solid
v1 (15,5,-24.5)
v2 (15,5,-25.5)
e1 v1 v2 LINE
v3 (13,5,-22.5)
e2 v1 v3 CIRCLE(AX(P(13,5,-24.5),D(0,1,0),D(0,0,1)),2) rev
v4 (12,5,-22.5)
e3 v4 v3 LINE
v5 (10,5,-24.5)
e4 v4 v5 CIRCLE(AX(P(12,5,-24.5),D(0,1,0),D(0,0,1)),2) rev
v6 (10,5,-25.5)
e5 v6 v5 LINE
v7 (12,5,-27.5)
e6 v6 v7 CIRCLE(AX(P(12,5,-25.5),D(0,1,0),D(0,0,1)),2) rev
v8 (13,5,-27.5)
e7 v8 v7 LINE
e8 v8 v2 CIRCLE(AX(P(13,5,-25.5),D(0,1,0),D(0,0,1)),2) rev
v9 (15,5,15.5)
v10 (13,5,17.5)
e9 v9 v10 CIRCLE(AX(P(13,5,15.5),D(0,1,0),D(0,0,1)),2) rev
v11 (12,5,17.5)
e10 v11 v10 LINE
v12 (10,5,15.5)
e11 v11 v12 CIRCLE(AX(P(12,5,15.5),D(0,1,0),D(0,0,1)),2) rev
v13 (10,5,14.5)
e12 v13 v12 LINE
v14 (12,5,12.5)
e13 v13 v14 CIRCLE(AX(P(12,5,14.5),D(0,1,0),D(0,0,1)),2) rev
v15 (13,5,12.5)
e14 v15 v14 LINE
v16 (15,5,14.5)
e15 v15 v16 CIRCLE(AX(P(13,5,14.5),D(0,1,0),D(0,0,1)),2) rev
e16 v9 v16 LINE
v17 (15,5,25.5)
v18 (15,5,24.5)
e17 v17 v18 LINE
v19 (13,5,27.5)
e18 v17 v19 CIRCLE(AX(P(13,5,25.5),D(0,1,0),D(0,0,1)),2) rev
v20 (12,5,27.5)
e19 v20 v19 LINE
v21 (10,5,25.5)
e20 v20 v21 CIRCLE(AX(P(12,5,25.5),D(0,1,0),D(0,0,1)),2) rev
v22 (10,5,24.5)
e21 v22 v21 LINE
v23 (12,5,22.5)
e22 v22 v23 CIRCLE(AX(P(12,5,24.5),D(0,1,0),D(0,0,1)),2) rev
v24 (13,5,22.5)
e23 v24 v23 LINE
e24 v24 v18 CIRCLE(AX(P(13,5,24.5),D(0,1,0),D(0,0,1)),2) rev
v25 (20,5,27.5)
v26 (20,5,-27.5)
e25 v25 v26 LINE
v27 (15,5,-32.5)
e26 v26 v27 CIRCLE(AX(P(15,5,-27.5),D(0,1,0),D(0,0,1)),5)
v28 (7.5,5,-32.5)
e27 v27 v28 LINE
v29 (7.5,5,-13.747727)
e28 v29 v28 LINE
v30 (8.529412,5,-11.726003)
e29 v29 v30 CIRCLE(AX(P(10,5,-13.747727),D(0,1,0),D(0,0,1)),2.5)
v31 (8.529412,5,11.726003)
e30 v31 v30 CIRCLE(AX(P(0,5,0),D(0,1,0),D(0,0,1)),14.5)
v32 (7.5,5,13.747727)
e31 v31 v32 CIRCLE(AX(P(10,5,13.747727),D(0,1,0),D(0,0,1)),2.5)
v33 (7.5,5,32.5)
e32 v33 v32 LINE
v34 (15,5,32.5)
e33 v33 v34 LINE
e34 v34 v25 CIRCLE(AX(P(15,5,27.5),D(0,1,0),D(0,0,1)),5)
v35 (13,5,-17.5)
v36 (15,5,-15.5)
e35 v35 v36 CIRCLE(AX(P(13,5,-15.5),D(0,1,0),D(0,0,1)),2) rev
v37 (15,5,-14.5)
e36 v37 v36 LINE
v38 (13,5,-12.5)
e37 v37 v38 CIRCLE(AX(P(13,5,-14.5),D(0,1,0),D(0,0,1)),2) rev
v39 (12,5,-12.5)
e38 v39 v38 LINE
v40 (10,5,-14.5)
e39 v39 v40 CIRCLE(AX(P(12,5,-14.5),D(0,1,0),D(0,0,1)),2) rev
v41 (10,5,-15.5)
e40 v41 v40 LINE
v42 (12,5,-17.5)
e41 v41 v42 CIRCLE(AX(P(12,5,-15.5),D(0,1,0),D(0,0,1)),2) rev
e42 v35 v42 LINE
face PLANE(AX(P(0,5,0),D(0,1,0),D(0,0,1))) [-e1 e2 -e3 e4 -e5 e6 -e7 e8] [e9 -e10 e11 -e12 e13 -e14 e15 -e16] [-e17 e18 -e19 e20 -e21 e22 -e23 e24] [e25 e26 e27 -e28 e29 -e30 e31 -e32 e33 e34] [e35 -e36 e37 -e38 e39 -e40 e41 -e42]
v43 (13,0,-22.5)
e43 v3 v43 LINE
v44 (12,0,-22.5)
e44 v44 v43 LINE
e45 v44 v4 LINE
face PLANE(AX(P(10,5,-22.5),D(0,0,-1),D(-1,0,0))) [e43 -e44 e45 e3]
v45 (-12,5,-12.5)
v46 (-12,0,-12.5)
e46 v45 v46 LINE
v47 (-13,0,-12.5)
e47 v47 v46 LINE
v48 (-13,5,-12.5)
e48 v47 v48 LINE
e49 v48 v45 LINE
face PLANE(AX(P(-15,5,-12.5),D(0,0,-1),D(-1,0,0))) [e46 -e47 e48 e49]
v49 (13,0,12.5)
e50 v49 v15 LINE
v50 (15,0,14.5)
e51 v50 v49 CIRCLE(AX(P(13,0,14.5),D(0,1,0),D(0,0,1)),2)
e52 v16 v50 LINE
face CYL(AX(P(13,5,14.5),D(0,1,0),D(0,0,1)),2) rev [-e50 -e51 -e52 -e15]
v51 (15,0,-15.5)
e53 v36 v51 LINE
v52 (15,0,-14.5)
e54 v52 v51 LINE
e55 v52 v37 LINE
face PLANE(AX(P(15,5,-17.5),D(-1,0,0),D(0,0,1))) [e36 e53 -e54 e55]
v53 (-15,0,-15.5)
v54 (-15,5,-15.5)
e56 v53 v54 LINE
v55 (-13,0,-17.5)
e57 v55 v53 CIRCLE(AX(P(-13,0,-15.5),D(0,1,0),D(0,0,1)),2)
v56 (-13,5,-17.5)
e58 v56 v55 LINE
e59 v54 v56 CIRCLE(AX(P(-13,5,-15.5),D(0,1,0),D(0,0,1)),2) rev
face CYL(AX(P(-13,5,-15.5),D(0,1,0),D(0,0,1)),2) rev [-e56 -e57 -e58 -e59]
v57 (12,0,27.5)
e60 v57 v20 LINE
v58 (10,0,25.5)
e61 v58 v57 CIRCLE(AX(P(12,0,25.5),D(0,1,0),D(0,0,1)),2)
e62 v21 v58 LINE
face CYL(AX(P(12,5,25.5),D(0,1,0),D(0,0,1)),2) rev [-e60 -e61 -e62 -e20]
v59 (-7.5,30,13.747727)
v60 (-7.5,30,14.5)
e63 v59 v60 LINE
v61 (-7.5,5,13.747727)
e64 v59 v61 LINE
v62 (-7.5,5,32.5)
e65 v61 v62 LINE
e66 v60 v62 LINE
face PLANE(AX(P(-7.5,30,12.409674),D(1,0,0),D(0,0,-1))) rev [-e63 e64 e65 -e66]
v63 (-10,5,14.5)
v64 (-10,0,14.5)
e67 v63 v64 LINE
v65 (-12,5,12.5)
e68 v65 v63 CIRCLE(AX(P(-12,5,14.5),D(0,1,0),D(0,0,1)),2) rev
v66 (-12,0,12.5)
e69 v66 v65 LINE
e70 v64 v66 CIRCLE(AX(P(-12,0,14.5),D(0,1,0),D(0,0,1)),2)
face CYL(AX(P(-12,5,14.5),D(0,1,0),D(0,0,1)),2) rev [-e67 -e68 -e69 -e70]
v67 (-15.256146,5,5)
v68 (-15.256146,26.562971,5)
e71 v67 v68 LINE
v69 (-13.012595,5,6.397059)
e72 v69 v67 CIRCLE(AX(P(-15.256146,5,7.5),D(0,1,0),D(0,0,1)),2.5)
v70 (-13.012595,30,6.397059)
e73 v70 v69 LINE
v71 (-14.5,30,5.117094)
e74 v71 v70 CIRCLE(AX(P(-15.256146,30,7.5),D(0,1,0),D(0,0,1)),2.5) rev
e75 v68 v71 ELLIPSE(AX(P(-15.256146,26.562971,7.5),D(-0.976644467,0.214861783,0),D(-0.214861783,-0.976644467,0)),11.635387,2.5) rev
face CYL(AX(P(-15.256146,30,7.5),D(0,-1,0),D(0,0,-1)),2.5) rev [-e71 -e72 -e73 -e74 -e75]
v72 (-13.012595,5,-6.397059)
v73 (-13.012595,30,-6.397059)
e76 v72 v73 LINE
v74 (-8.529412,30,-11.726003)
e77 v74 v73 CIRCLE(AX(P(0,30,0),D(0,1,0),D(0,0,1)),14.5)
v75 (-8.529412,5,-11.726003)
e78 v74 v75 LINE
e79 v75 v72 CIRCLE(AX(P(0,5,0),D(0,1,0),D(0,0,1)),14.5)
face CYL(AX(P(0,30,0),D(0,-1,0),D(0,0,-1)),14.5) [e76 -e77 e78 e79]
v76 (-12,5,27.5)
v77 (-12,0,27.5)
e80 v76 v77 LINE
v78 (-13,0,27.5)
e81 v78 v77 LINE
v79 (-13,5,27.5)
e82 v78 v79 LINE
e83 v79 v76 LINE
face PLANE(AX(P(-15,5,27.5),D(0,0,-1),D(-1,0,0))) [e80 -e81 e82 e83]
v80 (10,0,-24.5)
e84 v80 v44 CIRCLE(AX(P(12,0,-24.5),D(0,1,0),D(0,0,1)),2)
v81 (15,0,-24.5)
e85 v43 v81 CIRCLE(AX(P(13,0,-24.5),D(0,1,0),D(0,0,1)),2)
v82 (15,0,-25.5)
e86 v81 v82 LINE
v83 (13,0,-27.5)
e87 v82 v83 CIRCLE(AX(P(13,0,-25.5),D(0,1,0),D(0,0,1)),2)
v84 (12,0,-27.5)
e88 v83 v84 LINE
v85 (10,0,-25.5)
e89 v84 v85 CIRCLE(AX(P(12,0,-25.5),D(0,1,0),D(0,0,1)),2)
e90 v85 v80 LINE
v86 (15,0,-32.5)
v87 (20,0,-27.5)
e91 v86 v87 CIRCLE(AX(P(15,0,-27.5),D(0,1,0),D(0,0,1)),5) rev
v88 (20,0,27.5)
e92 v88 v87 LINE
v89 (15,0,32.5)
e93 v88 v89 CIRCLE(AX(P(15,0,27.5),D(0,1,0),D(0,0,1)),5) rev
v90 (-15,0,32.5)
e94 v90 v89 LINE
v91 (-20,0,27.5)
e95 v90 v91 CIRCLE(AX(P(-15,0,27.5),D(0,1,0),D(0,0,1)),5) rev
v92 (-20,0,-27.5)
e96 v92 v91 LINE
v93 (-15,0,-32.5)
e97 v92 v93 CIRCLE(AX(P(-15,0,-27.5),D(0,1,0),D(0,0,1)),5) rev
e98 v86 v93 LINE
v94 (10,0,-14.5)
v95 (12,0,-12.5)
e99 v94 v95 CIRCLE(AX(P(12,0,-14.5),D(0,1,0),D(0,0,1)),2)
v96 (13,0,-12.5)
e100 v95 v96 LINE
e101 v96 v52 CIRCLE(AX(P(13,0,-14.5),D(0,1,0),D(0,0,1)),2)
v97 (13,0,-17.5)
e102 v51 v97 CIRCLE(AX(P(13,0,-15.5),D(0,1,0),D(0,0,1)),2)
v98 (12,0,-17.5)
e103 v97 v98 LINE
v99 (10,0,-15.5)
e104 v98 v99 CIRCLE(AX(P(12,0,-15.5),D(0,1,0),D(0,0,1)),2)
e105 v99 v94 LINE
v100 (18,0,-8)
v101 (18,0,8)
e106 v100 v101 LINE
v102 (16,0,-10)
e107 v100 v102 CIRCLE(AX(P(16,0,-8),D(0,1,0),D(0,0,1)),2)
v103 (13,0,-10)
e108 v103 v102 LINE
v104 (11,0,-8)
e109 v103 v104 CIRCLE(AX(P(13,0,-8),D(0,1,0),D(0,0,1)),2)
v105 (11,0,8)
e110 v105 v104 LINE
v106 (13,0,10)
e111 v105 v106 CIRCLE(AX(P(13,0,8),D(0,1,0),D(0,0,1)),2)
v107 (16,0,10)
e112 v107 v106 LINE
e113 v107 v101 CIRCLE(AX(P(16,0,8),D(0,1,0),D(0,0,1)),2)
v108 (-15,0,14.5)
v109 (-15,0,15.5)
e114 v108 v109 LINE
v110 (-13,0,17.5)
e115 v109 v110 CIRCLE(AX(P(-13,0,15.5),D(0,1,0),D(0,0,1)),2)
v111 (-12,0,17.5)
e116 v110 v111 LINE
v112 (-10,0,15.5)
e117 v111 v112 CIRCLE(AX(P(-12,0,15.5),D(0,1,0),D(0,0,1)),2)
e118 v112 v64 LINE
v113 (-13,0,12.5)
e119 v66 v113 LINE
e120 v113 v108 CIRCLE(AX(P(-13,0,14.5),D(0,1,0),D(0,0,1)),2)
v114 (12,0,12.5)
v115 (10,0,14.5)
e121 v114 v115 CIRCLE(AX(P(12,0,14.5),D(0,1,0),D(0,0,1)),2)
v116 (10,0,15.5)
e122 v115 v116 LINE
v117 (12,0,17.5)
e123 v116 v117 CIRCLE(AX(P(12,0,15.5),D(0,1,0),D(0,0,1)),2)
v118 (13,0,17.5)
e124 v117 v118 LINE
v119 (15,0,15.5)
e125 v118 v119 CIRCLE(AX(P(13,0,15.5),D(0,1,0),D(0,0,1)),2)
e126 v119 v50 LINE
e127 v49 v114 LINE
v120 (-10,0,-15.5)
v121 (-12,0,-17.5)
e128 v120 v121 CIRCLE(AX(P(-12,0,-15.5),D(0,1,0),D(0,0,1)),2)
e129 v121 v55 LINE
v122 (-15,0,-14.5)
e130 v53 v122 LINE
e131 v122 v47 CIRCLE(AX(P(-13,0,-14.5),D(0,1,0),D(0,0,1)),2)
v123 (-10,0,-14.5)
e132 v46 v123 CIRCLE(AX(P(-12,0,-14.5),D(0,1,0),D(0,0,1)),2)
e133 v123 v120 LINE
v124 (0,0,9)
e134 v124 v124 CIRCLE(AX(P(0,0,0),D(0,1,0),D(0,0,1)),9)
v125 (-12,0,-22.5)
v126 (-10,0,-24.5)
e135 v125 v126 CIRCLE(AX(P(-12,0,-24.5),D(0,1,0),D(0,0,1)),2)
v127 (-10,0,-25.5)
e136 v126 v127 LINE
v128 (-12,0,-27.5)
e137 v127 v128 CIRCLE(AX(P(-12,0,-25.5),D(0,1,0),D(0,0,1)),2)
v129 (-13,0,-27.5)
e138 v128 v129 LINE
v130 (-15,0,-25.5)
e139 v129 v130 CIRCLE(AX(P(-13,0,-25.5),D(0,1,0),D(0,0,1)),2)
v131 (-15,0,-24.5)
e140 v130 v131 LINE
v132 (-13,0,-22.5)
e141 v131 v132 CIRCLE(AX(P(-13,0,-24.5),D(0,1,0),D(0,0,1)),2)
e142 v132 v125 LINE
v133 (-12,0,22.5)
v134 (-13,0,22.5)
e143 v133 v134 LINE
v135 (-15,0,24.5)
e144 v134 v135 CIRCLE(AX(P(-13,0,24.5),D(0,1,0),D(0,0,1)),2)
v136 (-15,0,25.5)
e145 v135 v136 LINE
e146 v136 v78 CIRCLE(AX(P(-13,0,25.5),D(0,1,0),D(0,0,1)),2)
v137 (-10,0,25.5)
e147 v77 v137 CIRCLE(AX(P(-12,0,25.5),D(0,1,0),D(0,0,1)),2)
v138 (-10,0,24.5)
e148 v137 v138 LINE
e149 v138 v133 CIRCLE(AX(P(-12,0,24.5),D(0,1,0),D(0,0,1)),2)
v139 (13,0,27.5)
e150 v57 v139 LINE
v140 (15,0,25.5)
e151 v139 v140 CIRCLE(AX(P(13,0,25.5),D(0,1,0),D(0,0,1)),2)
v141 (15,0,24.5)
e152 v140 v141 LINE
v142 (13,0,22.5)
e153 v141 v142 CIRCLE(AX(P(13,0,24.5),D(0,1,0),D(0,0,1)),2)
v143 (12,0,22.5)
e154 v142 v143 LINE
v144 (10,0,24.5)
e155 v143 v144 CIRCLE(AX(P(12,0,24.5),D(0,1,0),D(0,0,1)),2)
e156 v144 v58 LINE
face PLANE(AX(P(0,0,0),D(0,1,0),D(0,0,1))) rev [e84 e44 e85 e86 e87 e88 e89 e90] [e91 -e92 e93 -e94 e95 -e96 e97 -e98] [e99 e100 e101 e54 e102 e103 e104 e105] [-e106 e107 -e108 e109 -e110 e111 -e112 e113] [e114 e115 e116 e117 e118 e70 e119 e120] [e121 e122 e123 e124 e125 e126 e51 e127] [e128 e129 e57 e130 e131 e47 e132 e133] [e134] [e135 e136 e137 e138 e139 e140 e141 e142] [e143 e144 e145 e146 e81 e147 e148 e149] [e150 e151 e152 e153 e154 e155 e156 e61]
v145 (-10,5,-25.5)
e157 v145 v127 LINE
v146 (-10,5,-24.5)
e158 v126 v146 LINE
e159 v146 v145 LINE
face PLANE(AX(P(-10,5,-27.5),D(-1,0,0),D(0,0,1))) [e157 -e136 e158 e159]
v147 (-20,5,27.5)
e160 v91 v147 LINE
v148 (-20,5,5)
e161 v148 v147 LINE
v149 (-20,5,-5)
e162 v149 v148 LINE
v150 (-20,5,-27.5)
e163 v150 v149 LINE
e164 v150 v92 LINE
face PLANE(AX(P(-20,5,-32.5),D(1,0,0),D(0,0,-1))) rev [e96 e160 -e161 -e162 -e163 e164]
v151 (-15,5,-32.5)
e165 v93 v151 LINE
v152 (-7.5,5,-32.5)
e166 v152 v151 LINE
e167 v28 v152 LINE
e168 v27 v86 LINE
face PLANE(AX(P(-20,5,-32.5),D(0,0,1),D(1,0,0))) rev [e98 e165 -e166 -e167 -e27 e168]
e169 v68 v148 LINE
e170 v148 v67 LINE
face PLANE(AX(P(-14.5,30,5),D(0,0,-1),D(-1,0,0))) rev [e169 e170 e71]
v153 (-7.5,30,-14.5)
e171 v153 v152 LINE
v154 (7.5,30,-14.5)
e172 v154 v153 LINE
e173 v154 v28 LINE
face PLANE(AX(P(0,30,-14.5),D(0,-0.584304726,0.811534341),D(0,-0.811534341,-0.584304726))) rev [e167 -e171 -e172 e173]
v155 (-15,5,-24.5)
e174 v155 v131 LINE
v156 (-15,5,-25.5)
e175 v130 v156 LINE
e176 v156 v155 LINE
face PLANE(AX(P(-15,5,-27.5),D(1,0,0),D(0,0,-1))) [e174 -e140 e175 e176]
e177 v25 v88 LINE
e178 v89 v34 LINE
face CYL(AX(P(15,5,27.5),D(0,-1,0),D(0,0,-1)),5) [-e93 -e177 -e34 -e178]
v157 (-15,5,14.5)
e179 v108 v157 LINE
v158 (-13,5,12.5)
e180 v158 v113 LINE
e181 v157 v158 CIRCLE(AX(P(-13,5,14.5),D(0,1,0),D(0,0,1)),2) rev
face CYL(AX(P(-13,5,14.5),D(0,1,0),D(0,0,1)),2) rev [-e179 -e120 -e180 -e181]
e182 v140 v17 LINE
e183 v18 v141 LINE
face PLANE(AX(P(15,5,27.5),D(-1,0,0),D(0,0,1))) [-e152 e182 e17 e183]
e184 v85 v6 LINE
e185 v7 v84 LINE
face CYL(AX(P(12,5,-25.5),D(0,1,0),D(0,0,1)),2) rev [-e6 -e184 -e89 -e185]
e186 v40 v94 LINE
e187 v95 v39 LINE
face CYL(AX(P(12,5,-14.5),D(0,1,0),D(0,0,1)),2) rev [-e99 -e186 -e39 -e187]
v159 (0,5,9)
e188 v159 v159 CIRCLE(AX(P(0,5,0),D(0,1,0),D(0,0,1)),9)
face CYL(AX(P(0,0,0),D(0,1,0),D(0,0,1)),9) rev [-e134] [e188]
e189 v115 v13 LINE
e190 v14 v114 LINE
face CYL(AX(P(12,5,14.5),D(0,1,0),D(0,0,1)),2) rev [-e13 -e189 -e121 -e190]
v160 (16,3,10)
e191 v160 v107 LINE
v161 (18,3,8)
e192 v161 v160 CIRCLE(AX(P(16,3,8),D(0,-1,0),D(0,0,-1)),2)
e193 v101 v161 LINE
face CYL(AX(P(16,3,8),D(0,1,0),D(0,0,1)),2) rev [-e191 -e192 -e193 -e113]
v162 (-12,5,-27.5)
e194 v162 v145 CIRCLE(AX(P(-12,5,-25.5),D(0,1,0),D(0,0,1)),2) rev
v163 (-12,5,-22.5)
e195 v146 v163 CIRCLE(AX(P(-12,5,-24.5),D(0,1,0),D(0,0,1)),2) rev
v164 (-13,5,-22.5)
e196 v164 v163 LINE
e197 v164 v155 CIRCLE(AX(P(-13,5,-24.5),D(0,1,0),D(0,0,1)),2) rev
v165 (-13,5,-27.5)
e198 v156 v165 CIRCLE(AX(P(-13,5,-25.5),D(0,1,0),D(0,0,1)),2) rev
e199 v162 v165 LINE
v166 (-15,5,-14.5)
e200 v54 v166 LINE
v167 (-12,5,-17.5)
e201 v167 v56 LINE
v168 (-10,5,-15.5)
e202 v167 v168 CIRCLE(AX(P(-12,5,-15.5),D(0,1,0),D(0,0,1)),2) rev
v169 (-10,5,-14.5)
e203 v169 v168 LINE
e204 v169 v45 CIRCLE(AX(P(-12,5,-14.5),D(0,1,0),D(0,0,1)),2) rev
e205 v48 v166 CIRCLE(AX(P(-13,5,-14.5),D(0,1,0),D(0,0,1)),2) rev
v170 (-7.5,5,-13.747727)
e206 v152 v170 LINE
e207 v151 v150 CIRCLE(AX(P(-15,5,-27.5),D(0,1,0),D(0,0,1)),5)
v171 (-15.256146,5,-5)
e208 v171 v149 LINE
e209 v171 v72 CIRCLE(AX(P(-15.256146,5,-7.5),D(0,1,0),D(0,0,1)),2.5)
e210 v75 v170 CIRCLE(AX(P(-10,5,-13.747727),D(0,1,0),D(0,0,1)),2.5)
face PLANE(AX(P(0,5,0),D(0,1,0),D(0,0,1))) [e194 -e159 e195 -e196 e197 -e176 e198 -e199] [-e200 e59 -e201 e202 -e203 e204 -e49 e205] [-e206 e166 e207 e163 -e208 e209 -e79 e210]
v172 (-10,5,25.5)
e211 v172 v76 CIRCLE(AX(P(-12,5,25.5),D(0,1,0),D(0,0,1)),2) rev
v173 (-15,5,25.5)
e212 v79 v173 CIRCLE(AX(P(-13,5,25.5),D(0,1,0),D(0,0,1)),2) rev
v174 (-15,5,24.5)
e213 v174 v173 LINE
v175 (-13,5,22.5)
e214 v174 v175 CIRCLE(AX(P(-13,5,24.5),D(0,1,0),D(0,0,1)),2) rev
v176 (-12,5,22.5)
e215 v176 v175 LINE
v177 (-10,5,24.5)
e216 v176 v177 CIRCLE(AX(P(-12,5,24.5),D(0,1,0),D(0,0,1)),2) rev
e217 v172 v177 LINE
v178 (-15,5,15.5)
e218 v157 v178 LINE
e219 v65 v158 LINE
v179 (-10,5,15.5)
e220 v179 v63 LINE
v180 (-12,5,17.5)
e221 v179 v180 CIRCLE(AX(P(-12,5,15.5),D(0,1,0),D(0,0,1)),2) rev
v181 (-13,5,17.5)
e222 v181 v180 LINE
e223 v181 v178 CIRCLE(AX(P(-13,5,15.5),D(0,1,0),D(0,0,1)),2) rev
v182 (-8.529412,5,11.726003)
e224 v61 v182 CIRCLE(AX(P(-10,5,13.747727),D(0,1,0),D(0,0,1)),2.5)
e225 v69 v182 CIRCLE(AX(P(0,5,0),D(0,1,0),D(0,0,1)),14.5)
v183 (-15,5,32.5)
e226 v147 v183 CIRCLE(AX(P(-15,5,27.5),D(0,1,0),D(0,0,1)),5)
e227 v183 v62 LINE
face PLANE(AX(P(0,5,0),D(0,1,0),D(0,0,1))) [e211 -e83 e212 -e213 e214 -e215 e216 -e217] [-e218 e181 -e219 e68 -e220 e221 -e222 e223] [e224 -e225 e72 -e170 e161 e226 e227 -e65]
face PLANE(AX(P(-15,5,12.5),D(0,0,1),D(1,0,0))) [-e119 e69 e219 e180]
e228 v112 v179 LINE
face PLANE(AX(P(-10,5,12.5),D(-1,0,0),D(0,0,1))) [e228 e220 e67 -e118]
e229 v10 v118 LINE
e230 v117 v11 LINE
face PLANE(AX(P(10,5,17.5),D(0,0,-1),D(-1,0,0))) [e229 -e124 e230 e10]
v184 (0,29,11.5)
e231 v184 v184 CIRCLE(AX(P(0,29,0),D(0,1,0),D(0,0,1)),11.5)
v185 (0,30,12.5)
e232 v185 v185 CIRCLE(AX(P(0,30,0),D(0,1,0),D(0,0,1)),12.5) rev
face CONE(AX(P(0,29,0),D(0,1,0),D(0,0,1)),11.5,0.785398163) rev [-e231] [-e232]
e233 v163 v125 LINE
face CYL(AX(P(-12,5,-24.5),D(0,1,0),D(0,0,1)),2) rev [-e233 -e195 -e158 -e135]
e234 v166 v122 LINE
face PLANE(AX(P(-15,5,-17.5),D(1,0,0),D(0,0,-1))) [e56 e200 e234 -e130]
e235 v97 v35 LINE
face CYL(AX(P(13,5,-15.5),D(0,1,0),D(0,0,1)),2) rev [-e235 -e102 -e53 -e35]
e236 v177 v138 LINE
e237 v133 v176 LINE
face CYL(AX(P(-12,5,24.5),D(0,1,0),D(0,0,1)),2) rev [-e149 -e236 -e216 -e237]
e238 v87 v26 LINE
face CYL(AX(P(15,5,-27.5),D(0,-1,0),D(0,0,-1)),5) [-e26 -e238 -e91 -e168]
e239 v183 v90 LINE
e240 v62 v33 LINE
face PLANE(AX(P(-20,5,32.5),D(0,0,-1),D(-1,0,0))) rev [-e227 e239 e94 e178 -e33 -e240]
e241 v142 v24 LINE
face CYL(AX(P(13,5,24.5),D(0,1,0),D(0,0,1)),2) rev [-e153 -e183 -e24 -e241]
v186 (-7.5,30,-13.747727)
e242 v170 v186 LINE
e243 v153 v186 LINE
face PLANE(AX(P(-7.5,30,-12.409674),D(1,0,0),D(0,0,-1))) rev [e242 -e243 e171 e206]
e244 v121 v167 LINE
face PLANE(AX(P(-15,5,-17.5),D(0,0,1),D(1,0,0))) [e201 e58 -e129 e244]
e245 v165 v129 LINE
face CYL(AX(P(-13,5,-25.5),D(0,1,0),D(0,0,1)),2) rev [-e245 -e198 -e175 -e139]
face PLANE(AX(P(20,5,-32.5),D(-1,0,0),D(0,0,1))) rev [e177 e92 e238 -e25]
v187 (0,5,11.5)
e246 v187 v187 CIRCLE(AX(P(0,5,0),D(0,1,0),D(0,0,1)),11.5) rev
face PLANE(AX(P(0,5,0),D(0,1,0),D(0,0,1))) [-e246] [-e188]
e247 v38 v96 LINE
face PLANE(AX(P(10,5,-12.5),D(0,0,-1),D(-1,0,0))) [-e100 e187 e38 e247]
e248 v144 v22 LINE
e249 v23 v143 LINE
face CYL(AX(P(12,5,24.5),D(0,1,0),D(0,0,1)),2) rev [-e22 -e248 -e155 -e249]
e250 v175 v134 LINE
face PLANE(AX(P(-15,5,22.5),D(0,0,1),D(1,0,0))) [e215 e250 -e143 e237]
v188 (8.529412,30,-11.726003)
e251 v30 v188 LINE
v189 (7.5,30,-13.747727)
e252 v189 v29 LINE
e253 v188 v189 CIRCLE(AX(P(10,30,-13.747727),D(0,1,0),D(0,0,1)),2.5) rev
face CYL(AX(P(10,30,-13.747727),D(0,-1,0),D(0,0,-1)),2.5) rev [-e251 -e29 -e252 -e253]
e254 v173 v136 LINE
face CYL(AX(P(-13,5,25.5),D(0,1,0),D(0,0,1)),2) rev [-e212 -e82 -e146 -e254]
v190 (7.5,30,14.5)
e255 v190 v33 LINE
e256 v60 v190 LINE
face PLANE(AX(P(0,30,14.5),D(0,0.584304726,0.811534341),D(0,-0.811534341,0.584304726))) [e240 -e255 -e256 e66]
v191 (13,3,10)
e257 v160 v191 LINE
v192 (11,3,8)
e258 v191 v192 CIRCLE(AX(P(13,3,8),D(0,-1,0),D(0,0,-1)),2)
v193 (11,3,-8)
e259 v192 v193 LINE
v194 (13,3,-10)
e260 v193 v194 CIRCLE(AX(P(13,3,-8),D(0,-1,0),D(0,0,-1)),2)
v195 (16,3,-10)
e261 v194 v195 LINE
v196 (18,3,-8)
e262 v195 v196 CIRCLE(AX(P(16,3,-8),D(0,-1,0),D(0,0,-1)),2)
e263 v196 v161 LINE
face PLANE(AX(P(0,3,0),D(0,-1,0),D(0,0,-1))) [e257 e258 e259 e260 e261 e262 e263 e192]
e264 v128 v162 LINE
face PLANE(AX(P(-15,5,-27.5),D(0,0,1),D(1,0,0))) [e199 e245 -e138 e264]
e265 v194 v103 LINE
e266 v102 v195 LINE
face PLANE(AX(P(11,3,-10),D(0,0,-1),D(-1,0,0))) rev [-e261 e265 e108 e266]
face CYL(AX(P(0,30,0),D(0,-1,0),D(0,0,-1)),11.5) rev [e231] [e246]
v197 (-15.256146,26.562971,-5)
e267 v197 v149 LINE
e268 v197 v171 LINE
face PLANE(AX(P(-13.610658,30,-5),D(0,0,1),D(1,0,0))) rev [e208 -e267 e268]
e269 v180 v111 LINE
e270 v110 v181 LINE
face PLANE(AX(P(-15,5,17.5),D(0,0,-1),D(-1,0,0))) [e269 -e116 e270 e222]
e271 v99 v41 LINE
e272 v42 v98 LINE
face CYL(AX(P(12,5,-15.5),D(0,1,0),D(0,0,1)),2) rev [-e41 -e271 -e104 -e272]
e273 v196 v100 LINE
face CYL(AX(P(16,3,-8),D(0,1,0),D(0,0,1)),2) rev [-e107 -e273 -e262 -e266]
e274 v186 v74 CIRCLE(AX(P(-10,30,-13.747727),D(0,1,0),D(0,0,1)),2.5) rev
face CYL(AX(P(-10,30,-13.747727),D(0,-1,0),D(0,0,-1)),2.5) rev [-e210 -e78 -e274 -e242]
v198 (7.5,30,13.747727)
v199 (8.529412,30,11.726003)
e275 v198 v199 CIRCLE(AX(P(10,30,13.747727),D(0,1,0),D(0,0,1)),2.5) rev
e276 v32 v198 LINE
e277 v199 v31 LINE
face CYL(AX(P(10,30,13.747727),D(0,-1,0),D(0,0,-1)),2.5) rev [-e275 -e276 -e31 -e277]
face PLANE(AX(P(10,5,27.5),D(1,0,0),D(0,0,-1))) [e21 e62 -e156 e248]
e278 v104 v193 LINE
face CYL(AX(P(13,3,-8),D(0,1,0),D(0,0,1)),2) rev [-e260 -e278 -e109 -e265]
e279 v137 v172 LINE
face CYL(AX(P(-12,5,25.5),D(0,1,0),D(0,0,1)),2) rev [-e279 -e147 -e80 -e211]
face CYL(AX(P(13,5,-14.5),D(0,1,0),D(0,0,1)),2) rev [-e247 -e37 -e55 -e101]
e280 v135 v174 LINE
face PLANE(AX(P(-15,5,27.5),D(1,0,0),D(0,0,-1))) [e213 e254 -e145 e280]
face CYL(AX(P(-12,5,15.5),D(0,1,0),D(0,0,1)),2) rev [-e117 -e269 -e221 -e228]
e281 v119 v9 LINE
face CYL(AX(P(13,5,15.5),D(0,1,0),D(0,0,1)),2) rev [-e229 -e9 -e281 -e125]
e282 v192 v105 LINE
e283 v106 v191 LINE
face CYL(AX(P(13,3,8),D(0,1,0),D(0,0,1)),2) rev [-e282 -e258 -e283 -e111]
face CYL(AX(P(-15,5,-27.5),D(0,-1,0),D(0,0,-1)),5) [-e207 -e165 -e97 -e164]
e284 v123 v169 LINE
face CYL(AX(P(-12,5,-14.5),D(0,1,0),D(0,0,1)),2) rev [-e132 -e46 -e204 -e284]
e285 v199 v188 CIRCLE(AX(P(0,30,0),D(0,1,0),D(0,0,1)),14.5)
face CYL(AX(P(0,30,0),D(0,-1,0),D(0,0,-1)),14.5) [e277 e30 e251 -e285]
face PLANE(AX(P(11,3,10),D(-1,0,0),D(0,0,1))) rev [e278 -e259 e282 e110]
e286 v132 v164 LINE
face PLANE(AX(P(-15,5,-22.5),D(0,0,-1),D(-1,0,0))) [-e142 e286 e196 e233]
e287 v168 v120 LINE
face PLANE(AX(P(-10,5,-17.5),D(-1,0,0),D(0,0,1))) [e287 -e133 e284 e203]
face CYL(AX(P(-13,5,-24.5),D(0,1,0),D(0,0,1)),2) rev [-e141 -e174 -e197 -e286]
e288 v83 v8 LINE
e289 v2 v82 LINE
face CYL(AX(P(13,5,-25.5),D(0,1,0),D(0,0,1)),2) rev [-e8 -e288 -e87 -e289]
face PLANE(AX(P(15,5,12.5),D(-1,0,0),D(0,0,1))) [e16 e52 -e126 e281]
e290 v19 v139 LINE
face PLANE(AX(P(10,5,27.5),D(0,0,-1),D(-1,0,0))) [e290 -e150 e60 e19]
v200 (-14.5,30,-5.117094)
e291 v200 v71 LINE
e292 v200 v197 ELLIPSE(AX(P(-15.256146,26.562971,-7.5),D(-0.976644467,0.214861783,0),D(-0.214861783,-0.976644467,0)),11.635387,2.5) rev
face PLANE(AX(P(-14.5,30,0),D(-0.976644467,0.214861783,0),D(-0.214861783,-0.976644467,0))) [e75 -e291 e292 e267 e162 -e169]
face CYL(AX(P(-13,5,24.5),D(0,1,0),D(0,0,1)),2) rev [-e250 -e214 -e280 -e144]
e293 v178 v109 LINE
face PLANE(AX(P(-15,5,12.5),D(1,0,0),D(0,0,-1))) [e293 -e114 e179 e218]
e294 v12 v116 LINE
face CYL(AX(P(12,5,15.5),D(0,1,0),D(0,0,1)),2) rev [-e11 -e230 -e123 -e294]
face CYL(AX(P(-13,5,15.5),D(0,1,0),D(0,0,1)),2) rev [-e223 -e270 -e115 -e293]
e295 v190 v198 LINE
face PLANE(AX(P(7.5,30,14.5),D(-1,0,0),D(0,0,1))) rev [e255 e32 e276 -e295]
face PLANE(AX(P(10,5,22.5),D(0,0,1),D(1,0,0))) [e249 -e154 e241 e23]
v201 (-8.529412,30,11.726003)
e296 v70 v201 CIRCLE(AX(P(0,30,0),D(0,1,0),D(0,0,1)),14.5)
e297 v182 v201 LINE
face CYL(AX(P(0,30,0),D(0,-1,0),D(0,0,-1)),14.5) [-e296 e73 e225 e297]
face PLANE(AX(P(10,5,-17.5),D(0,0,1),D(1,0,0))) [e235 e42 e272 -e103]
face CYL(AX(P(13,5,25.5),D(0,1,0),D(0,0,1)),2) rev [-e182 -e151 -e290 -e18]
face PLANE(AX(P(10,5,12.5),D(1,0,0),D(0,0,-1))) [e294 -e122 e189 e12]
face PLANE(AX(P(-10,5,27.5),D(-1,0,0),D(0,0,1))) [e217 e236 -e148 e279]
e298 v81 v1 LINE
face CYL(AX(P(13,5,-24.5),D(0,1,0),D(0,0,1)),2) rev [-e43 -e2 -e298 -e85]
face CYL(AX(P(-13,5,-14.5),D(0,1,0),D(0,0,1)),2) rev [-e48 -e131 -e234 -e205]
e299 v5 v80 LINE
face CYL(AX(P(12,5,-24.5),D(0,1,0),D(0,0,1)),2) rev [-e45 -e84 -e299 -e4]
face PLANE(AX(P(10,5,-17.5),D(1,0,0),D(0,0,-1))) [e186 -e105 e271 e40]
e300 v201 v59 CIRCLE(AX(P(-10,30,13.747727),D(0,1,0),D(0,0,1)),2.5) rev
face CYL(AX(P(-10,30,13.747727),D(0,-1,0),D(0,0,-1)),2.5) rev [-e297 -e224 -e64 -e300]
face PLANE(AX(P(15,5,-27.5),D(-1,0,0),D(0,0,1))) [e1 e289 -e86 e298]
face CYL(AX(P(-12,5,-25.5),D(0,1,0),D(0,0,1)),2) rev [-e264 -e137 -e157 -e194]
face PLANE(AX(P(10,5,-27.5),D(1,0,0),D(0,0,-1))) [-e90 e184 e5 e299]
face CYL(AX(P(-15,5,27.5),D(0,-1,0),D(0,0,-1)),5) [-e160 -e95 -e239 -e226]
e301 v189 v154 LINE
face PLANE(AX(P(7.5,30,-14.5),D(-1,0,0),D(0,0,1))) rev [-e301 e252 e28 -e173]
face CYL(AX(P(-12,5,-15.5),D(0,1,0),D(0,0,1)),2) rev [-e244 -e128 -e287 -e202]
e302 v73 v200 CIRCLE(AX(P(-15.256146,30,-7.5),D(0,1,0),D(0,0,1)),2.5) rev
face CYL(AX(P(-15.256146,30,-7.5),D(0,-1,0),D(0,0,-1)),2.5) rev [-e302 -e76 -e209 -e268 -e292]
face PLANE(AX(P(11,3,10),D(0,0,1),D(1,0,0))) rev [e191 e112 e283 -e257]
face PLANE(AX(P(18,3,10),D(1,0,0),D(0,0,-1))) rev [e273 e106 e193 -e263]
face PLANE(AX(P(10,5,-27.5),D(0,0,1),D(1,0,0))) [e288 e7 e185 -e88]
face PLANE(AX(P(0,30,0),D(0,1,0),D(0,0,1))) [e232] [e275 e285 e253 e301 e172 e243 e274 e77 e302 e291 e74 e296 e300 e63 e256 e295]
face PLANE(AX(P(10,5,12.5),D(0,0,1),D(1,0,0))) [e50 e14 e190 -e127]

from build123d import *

# Parameters (mm, degrees)
SKETCH1_W                       = 40
SKETCH1_H                       = 65
SKETCH1_W_2                     = 5
SKETCH1_H_2                     = 5
MOUNTBASE_DEPTH                 = 5
SKETCH4_R                       = 11.5
PIPEBASE_DEPTH                  = 25
RIB3_REACH                      = 50.541
SKETCH6_WALL_W                  = 124.680290668
SKETCH6_WALL_H                  = 10
RIB5_REACH                      = 50.541
SKETCH7_WALL_W                  = 129.888282796
SKETCH7_WALL_H                  = 15
BASEFILLET_R                    = 5
PIPEFILLET_R                    = 2.5
INNERMATERIALREMOVAL_DEPTH      = 46.620718977
INNERMATERIALREMOVAL_DEPTH_BACK = 46.620718977
SKETCH8_R                       = 9
PIPECHAMFER_SIZE                = 1
FILLET5_R                       = 2
CUT_EXTRUDE2_START              = -25
CUT_EXTRUDE2_DEPTH              = 25
SKETCH10_W                      = 7
SKETCH10_H                      = 20
CUT_EXTRUDE3_DEPTH              = 3
FILLET6_R                       = 2


with BuildPart() as part:
    # Sketch1 → MountBase (new body)
    with BuildSketch(Plane(origin=(0, 0, 0), x_dir=(1, 0, 0), z_dir=(0, 1, 0))):
        Rectangle(SKETCH1_W, SKETCH1_H)
        with Locations((-12.5, 15)):
            Rectangle(SKETCH1_W_2, SKETCH1_H_2, mode=Mode.SUBTRACT)
        with Locations((-12.5, -15)):
            Rectangle(SKETCH1_W_2, SKETCH1_H_2, mode=Mode.SUBTRACT)
        with Locations((12.5, 15)):
            Rectangle(SKETCH1_W_2, SKETCH1_H_2, mode=Mode.SUBTRACT)
        with Locations((12.5, -15)):
            Rectangle(SKETCH1_W_2, SKETCH1_H_2, mode=Mode.SUBTRACT)
        with Locations((-12.5, -25)):
            Rectangle(SKETCH1_W_2, SKETCH1_H_2, mode=Mode.SUBTRACT)
        with Locations((12.5, -25)):
            Rectangle(SKETCH1_W_2, SKETCH1_H_2, mode=Mode.SUBTRACT)
        with Locations((-12.5, 25)):
            Rectangle(SKETCH1_W_2, SKETCH1_H_2, mode=Mode.SUBTRACT)
        with Locations((12.5, 25)):
            Rectangle(SKETCH1_W_2, SKETCH1_H_2, mode=Mode.SUBTRACT)
    extrude(amount=MOUNTBASE_DEPTH)

    # Sketch4 → PipeBase (add)
    with BuildSketch(Plane(origin=(0, 5, 0), x_dir=(1, 0, 0), z_dir=(0, 1, 0))):
        with BuildLine():
            Line((-14.5, 5), (-14.5, -5))
            Line((-14.5, -5), (-13.610657589, -5))
            ThreePointArc((-13.610657589, -5), (-11.186634071, -9.225465742), (-7.5, -12.409673646))
            Line((-7.5, -12.409673646), (-7.5, -14.5))
            Line((-7.5, -14.5), (7.5, -14.5))
            Line((7.5, -14.5), (7.5, -12.409673646))
            ThreePointArc((7.5, -12.409673646), (11.186634071, -9.225465742), (13.610657589, -5))
            Line((13.610657589, -5), (14.5, -5))
            Line((14.5, -5), (14.5, 5))
            Line((14.5, 5), (13.610657589, 5))
            ThreePointArc((13.610657589, 5), (11.186634071, 9.225465742), (7.5, 12.409673646))
            Line((7.5, 12.409673646), (7.5, 14.5))
            Line((7.5, 14.5), (-7.5, 14.5))
            Line((-7.5, 14.5), (-7.5, 12.409673646))
            ThreePointArc((-7.5, 12.409673646), (-11.186634071, 9.225465742), (-13.610657589, 5))
            Line((-13.610657589, 5), (-14.5, 5))
        make_face()
        with Locations(Location((0, 0, 0), (0, 0, 270))):
            Circle(SKETCH4_R, mode=Mode.SUBTRACT)
    extrude(amount=PIPEBASE_DEPTH)

    # Sketch6 wall → Rib3 (add, up to next)
    with BuildSketch(Plane(origin=(-17.25, 17.5, 0), x_dir=(-0.214861782675, -0.976644466705, 0), z_dir=(0.976644466705, -0.214861782675, 0)), mode=Mode.PRIVATE) as rib3_sk1:
        Rectangle(SKETCH6_WALL_W, SKETCH6_WALL_H)
    rib3_tool1 = extrude(rib3_sk1.sketch, amount=RIB3_REACH, mode=Mode.PRIVATE) - part.part
    rib3 = rib3_tool1.solids().sort_by_distance((-17.25, 17.5, 0))[0]
    add(rib3)

    # Mirror1: Rib3 across plane
    add(rib3.mirror(Plane(origin=(0, 0, 0), x_dir=(0, 0, 1), z_dir=(1, 0, 0))))

    # Sketch7 wall → Rib5 (add, up to next)
    with BuildSketch(Plane(origin=(0, 17.5, 23.5), x_dir=(0, -0.811534341451, 0.584304725845), z_dir=(0, -0.584304725845, -0.811534341451)), mode=Mode.PRIVATE) as rib5_sk1:
        Rectangle(SKETCH7_WALL_W, SKETCH7_WALL_H)
    rib5_tool1 = extrude(rib5_sk1.sketch, amount=RIB5_REACH, mode=Mode.PRIVATE) - part.part
    rib5 = rib5_tool1.solids().sort_by_distance((0, 17.5, 23.5))[0]
    add(rib5)

    # Mirror2: Rib5 across plane
    add(rib5.mirror(Plane.XY))

    # BaseFillet
    basefillet_edges = [part.edges().sort_by_distance(p)[0] for p in [
        (20, 2.5, 32.5),
        (-20, 2.5, 32.5),
        (-20, 2.5, -32.5),
        (20, 2.5, -32.5),
    ]]
    fillet(basefillet_edges, radius=BASEFILLET_R)

    # PipeFillet
    # the kernel refuses this fillet: 2.5 mm, written as the material it adds along each edge
    with BuildSketch(Plane(origin=(-13.610657589, 0.886278216, -5), x_dir=(-1, 0, 0), z_dir=(0, 1, 0))) as pipefillet_piece_1_section:
        with BuildLine():
            CenterArc((1.645488714, -2.5), PIPEFILLET_R, 90, 63.821031296)
            ThreePointArc((-0.598062213, -1.397058824), (-0.280715993, -0.706369867), (0, 0))
            Line((0, 0), (1.645488714, 0))
        make_face()
    pipefillet_piece_1 = extrude(amount=29.113721784, mode=Mode.PRIVATE)
    pipefillet_piece_1 = split(pipefillet_piece_1, bisect_by=Plane(origin=(-20.148077302, 4.326921354, -5.304724049), z_dir=(0.976644466705111, -0.2148617826750244, 0)), keep=Keep.TOP, mode=Mode.PRIVATE)
    add(pipefillet_piece_1)
    with BuildSketch(Plane(origin=(-7.5, 1.654866403, -12.409673646), x_dir=(-0.8330213423374977, 0, 0.5532408546105696), z_dir=(0, 1, 0))) as pipefillet_piece_2:
        with BuildLine():
            CenterArc((1.342287528, -2.497729208), PIPEFILLET_R, 92.442244575, 53.968120928)
            Line((-0.740265828, -1.114627072), (0, 0))
            ThreePointArc((0, 0), (0.617878386, -0.013170592), (1.235756772, 0))
        make_face()
    extrude(amount=28.345133597)
    with BuildSketch(Plane(origin=(-13.610657589, 0.886278216, 5), x_dir=(-1, 0, 0), z_dir=(0, 1, 0))) as pipefillet_piece_3_section:
        with BuildLine():
            CenterArc((1.645488714, 2.5), PIPEFILLET_R, 206.178968704, 63.821031296)
            ThreePointArc((-0.598062213, 1.397058824), (-0.280715993, 0.706369867), (0, 0))
            Line((0, 0), (1.645488714, 0))
        make_face()
    pipefillet_piece_3 = extrude(amount=29.113721784, mode=Mode.PRIVATE)
    pipefillet_piece_3 = split(pipefillet_piece_3, bisect_by=Plane(origin=(-20.148077302, 4.326921354, 5.304724049), z_dir=(0.976644466705111, -0.2148617826750244, 0)), keep=Keep.TOP, mode=Mode.PRIVATE)
    add(pipefillet_piece_3)
    with BuildSketch(Plane(origin=(-7.5, 1.654866403, 12.409673646), x_dir=(-0.8330213423374981, 0, -0.5532408546105689), z_dir=(0, 1, 0))) as pipefillet_piece_4:
        with BuildLine():
            CenterArc((1.342287528, 2.497729208), PIPEFILLET_R, 213.589634497, 53.968120928)
            Line((-0.740265828, 1.114627072), (0, 0))
            ThreePointArc((0, 0), (0.617878386, 0.013170592), (1.235756772, 0))
        make_face()
    extrude(amount=28.345133597)
    with BuildSketch(Plane(origin=(7.5, 1.654866403, 12.409673646), x_dir=(0, 0, 1), z_dir=(0, 1, 0))) as pipefillet_piece_5:
        with BuildLine():
            CenterArc((1.338053439, 2.5), PIPEFILLET_R, 216.031879072, 53.968120928)
            ThreePointArc((-0.683671132, 1.029411765), (-0.330864182, 0.521992392), (0, 0))
            Line((0, 0), (1.338053439, 0))
        make_face()
    extrude(amount=28.345133597)
    with BuildSketch(Plane(origin=(13.610657589, 0.886278216, 5), x_dir=(1, 0, 0), z_dir=(0, 1, 0))) as pipefillet_piece_6_section:
        with BuildLine():
            CenterArc((1.645488714, -2.5), PIPEFILLET_R, 90, 63.821031296)
            ThreePointArc((-0.598062213, -1.397058824), (-0.280715993, -0.706369867), (0, 0))
            Line((0, 0), (1.645488714, 0))
        make_face()
    pipefillet_piece_6 = extrude(amount=29.113721784, mode=Mode.PRIVATE)
    pipefillet_piece_6 = split(pipefillet_piece_6, bisect_by=Plane(origin=(20.148077302, 4.326921354, 5.304724049), z_dir=(-0.976644466705111, -0.21486178267502437, 0)), keep=Keep.TOP, mode=Mode.PRIVATE)
    add(pipefillet_piece_6)
    with BuildSketch(Plane(origin=(13.610657589, 0.886278216, -5), x_dir=(-0.3935427494511154, 0, -0.9193063169338371), z_dir=(0, 1, 0))) as pipefillet_piece_7_section:
        with BuildLine():
            CenterArc((1.65069564, -2.496565042), PIPEFILLET_R, 93.003848679, 63.821031296)
            Line((-0.647570153, -1.512708169), (0, 0))
            ThreePointArc((0, 0), (0.759844025, -0.019922754), (1.519688049, 0))
        make_face()
    pipefillet_piece_7 = extrude(amount=29.113721784, mode=Mode.PRIVATE)
    pipefillet_piece_7 = split(pipefillet_piece_7, bisect_by=Plane(origin=(20.148077302, 4.326921354, -5.304724049), z_dir=(-0.976644466705111, -0.21486178267502437, 0)), keep=Keep.TOP, mode=Mode.PRIVATE)
    add(pipefillet_piece_7)
    with BuildSketch(Plane(origin=(7.5, 1.654866403, -12.409673646), x_dir=(0, 0, -1), z_dir=(0, 1, 0))) as pipefillet_piece_8:
        with BuildLine():
            CenterArc((1.338053439, -2.5), PIPEFILLET_R, 90, 53.968120928)
            ThreePointArc((-0.683671132, -1.029411765), (-0.330864182, -0.521992392), (0, 0))
            Line((0, 0), (1.338053439, 0))
        make_face()
    extrude(amount=28.345133597)

    # Sketch8 → InnerMaterialRemoval (cut, two sides: drawn at the far end of the back side and taken through both)
    with BuildSketch(Plane(origin=(0, 5, 0), x_dir=(1, 0, 0), z_dir=(0, 1, 0)).offset(-INNERMATERIALREMOVAL_DEPTH_BACK)):
        with Locations(Location((0, 0, 0), (0, 0, 270))):
            Circle(SKETCH8_R)
    extrude(amount=INNERMATERIALREMOVAL_DEPTH + INNERMATERIALREMOVAL_DEPTH_BACK, mode=Mode.SUBTRACT)

    # PipeChamfer
    pipechamfer_edges = [part.edges().sort_by_distance(p)[0] for p in [
        (0, 30, -11.5),
    ]]
    chamfer(pipechamfer_edges, length=PIPECHAMFER_SIZE)

    # Fillet5
    fillet5_edges = [part.edges().sort_by_distance(p)[0] for p in [
        (10, 2.5, -27.5),
        (10, 2.5, -22.5),
        (15, 2.5, -22.5),
        (15, 2.5, -27.5),
        (-10, 2.5, -12.5),
        (-10, 2.5, -17.5),
        (-15, 2.5, -17.5),
        (-15, 2.5, -12.5),
        (-10, 2.5, 17.5),
        (-10, 2.5, 12.5),
        (-15, 2.5, 12.5),
        (-15, 2.5, 17.5),
        (15, 2.5, -12.5),
        (15, 2.5, -17.5),
        (10, 2.5, -17.5),
        (10, 2.5, -12.5),
        (15, 2.5, 17.5),
        (15, 2.5, 12.5),
        (10, 2.5, 12.5),
        (10, 2.5, 17.5),
        (-10, 2.5, 27.5),
        (-10, 2.5, 22.5),
        (-15, 2.5, 22.5),
        (-15, 2.5, 27.5),
        (15, 2.5, 27.5),
        (15, 2.5, 22.5),
        (10, 2.5, 22.5),
        (10, 2.5, 27.5),
        (-15, 2.5, -27.5),
        (-15, 2.5, -22.5),
        (-10, 2.5, -22.5),
        (-10, 2.5, -27.5),
    ]]
    fillet(fillet5_edges, radius=FILLET5_R)

    # Sketch9 → Cut-Extrude2 (cut)
    with BuildSketch(Plane(origin=(0, 30, 0), x_dir=(1, 0, 0), z_dir=(0, 1, 0)).offset(CUT_EXTRUDE2_START)):
        with BuildLine():
            Line((7.5, -13.747727085), (8.27770049, -13.747727085))
            Line((8.27770049, -13.747727085), (20, -7.665046243))
            Line((20, -7.665046243), (20, 7.665046243))
            Line((20, 7.665046243), (8.27770049, 13.747727085))
            Line((8.27770049, 13.747727085), (7.5, 13.747727085))
            ThreePointArc((7.5, 13.747727085), (7.772168028, 12.613370569), (8.529411765, 11.726002514))
            ThreePointArc((8.529411765, 11.726002514), (11.095671594, 9.334670422), (13.012595376, 6.397058824))
            ThreePointArc((13.012595376, 6.397058824), (13.625464362, 5.605039206), (14.5, 5.11709363))
            Line((14.5, 5.11709363), (14.5, -5.11709363))
            ThreePointArc((14.5, -5.11709363), (13.625464362, -5.605039206), (13.012595376, -6.397058824))
            ThreePointArc((13.012595376, -6.397058824), (11.095671594, -9.334670422), (8.529411765, -11.726002514))
            ThreePointArc((8.529411765, -11.726002514), (7.772168028, -12.613370569), (7.5, -13.747727085))
        make_face()
        with BuildLine():
            ThreePointArc((14.5, 5.11709363), (13.625464362, 5.605039206), (13.012595376, 6.397058824))
            ThreePointArc((13.012595376, 6.397058824), (14.123254458, 3.283851934), (14.5, 0))
            Line((14.5, 0), (14.5, 5.11709363))
        make_face()
        with BuildLine():
            Line((14.5, -5.11709363), (14.5, 0))
            ThreePointArc((14.5, 0), (14.123254458, -3.283851934), (13.012595376, -6.397058824))
            ThreePointArc((13.012595376, -6.397058824), (13.625464362, -5.605039206), (14.5, -5.11709363))
        make_face()
    extrude(amount=CUT_EXTRUDE2_DEPTH, mode=Mode.SUBTRACT)

    # Sketch10 → Cut-Extrude3 (cut)
    with BuildSketch(Plane.XZ):
        with Locations((14.5, 0)):
            Rectangle(SKETCH10_W, SKETCH10_H)
    extrude(amount=-CUT_EXTRUDE3_DEPTH, mode=Mode.SUBTRACT)

    # Fillet6
    fillet6_edges = [part.edges().sort_by_distance(p)[0] for p in [
        (18, 1.5, 10),
        (18, 1.5, -10),
        (11, 1.5, -10),
        (11, 1.5, 10),
    ]]
    fillet(fillet6_edges, radius=FILLET6_R)


solid = part.part
